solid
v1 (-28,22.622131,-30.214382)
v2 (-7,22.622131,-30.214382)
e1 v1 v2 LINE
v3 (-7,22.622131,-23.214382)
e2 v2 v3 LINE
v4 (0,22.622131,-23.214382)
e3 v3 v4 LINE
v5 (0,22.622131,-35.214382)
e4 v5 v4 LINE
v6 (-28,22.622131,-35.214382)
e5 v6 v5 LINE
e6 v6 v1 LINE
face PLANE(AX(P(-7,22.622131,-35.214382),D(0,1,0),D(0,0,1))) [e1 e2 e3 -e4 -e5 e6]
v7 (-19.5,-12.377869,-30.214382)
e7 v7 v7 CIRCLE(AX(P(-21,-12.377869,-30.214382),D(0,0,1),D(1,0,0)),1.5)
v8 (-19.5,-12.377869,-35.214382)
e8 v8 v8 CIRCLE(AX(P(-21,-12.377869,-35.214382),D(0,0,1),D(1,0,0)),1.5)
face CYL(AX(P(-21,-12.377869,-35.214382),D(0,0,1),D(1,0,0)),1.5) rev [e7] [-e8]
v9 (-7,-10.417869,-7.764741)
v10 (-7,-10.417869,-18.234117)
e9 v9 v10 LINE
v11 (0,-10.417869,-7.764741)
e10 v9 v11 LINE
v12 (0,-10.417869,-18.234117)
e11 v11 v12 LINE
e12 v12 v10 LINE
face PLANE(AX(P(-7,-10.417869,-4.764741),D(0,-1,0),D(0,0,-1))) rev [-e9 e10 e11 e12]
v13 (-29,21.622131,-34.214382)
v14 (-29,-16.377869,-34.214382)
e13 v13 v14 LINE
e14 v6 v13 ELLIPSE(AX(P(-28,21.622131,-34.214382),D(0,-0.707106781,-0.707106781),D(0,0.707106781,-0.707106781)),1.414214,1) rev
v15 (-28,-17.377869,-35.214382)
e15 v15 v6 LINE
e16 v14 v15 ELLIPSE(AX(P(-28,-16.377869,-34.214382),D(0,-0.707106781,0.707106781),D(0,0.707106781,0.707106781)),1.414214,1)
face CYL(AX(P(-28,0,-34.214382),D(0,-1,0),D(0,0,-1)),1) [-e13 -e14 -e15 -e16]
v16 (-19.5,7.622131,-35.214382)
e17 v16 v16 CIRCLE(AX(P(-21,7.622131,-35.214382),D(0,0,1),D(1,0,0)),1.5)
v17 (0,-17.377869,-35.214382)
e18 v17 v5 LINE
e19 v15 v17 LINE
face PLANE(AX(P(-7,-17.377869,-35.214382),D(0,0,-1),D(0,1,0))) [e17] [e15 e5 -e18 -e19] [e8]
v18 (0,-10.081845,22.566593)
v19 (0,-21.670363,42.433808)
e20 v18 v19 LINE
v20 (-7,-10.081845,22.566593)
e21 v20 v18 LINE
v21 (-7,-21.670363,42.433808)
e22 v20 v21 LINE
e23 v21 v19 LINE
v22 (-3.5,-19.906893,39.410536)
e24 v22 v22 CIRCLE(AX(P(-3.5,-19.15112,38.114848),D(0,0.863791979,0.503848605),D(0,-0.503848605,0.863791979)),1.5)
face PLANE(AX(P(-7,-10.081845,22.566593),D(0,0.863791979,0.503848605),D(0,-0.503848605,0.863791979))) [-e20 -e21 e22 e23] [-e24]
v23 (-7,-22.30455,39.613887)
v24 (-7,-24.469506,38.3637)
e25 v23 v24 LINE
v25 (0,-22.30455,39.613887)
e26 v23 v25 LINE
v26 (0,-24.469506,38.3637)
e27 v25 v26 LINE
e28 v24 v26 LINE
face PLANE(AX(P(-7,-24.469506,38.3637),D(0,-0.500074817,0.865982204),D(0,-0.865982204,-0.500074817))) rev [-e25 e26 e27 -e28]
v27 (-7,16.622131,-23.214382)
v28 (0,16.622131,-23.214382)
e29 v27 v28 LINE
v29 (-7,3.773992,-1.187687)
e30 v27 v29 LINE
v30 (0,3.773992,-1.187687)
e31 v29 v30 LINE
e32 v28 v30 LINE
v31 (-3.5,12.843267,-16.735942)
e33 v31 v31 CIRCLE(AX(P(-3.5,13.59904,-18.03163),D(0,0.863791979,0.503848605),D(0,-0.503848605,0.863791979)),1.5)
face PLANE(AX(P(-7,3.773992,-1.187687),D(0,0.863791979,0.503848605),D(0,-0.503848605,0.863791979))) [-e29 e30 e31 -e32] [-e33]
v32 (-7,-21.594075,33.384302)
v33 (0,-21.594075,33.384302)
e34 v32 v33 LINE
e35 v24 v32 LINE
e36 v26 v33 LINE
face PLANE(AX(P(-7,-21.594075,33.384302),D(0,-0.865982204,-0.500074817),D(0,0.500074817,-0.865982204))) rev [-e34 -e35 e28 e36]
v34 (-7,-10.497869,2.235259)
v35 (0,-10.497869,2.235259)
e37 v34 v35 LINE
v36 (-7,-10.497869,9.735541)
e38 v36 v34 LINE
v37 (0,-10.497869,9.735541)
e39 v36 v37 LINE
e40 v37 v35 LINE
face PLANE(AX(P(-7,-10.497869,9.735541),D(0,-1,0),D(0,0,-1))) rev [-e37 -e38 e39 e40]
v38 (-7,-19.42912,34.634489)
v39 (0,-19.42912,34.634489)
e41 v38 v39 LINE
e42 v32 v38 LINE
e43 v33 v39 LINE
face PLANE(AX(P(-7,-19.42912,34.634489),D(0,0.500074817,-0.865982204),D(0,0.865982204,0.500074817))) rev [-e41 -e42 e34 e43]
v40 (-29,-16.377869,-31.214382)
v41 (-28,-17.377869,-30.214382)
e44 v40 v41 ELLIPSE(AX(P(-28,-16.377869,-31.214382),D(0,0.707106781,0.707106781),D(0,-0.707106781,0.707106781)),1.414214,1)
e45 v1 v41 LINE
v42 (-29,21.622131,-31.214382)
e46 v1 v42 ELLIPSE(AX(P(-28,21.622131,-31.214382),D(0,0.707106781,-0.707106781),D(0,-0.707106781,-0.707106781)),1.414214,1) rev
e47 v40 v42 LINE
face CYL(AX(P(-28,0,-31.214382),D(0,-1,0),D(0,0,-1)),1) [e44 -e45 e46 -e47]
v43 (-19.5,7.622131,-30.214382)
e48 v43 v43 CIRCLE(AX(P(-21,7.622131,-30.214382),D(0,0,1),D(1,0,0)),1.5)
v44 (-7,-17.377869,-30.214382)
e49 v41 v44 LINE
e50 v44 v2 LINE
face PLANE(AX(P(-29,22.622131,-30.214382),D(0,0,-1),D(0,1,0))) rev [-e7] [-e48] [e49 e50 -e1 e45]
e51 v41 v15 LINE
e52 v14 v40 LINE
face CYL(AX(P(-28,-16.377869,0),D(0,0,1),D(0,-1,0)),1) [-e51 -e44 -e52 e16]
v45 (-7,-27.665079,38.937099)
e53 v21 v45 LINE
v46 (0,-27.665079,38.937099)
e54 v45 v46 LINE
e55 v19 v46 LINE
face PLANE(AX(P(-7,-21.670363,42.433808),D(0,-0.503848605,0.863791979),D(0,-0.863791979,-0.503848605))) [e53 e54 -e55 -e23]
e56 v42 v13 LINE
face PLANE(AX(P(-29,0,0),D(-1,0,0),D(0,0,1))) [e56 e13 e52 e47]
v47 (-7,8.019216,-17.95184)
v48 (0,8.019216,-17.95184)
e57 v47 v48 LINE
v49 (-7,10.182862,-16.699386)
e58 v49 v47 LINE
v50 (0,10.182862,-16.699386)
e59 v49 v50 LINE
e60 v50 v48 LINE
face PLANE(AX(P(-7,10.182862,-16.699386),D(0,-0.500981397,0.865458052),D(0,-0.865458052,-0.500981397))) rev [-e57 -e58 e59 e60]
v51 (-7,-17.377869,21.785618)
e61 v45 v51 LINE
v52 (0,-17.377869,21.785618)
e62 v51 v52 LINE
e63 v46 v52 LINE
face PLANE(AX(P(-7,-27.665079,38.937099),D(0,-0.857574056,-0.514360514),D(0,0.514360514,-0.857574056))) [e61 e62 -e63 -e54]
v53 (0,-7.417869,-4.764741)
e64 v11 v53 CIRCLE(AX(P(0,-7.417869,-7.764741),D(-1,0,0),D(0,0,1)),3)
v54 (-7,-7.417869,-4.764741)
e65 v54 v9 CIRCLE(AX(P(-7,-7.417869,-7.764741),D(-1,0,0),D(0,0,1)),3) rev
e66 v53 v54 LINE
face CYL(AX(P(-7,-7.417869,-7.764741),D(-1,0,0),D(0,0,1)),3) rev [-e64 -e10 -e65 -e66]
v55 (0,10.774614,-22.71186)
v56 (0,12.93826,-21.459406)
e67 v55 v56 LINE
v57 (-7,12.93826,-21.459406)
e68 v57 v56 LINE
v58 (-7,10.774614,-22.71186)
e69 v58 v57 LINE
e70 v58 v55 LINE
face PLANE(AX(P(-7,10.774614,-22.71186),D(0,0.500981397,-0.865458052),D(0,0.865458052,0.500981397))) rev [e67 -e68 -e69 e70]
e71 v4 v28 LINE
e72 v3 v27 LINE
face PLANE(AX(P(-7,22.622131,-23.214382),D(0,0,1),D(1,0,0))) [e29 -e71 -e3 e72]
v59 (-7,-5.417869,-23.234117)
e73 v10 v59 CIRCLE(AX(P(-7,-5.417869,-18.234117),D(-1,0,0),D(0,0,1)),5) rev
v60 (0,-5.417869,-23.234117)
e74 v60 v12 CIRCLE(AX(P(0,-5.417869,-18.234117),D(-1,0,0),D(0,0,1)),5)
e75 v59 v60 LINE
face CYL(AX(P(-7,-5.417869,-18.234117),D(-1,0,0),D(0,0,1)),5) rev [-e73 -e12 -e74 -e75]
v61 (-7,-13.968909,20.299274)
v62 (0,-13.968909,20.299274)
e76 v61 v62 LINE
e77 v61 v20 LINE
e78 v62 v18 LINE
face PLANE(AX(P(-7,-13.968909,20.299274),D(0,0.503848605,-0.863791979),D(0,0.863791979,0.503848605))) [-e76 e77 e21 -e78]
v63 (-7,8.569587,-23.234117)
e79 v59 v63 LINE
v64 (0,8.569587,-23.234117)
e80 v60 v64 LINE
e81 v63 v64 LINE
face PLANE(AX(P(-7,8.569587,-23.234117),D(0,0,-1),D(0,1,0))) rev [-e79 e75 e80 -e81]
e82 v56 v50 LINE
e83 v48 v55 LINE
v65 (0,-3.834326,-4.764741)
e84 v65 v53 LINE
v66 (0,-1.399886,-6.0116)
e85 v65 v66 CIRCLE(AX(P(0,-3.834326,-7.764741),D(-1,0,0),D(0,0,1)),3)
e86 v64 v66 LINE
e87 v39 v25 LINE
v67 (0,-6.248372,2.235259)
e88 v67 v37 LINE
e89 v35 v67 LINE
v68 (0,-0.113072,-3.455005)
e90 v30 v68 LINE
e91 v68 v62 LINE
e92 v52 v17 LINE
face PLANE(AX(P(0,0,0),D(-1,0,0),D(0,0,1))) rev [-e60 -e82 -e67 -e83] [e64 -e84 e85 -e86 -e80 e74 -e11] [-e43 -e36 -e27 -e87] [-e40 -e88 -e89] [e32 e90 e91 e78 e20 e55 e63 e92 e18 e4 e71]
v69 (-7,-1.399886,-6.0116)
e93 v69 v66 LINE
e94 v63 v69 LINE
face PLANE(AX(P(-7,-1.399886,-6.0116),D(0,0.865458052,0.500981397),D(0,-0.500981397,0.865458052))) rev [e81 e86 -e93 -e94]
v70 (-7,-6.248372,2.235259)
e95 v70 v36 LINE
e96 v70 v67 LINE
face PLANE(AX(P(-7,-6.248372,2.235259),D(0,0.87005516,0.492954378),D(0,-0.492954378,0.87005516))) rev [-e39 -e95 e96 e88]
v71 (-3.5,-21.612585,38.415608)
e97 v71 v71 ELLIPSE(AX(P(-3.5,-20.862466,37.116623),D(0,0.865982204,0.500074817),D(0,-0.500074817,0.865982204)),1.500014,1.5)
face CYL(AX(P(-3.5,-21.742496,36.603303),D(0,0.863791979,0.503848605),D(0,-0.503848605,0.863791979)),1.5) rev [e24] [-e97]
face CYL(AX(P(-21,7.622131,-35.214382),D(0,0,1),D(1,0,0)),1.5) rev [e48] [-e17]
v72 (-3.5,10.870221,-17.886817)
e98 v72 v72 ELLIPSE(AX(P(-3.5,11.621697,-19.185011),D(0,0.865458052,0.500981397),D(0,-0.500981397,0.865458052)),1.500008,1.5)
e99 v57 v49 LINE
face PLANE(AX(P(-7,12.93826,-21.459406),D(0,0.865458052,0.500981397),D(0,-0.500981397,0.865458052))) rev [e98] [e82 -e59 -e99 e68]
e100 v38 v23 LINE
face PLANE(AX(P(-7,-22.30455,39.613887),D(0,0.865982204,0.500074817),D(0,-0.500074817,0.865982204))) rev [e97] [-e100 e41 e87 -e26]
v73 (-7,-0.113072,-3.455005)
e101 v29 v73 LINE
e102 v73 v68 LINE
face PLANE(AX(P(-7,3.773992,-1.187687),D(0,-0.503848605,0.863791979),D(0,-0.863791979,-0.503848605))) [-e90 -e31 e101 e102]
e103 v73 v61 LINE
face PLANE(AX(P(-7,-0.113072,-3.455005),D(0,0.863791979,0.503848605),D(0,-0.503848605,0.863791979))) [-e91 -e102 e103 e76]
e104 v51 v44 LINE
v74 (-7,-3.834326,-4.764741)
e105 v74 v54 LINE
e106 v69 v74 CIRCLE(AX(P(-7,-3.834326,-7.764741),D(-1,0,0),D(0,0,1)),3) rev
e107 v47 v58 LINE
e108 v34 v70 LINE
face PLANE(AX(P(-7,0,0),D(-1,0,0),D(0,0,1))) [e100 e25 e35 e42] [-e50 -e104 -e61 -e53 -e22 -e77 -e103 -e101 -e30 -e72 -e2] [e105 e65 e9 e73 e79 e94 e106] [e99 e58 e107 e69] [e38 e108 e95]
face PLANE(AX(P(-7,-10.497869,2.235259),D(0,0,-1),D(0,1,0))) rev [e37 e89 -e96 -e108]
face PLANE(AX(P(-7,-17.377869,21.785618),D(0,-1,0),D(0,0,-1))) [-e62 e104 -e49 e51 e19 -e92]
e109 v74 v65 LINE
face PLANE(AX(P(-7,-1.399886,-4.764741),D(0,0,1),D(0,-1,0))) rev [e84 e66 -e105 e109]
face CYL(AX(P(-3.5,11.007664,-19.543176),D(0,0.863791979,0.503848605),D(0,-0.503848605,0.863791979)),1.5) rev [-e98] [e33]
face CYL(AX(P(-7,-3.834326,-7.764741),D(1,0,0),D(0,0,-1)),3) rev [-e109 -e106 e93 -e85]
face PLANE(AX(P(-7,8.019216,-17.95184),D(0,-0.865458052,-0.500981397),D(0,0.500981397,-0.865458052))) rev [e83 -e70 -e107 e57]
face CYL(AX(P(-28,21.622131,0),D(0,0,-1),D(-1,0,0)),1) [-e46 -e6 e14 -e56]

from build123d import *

# Parameters (mm, degrees)
BOSS_EXTRUDE1_DEPTH = 7
FILLET1_R           = 3
FILLET2_R           = 5
SKETCH2_W           = 5
SKETCH2_H           = 40
BOSS_EXTRUDE2_DEPTH = 22
SKETCH4_R           = 1.5
CUT_EXTRUDE1_DEPTH  = 3
SKETCH5_R           = 1.5
CUT_EXTRUDE2_DEPTH  = 5
FILLET3_R           = 1


with BuildPart() as part:
    # Sketch1 → Boss-Extrude1 (new body)
    with BuildSketch(Plane(origin=(0, 0, 0), x_dir=(0, 0, -1), z_dir=(1, 0, 0))):
        Polygon((-21.785617828, -17.377868865), (35.214382172, -17.377868865), (35.214382172, 22.622131135), (23.214382172, 22.622131135), (23.214382172, 16.622131135), (1.187686697, 3.773991719), (3.455005417, -0.113072189), (-20.299274017, -13.968908814), (-22.566592737, -10.081844907), (-42.433808264, -21.670362811), (-38.937098948, -27.665079148), align=None)
        Polygon((23.234116709, 8.569586546), (23.234116709, -10.417868865), (4.764740561, -10.417868865), (4.764740561, -1.399885987), (6.011600394, -1.399885987), align=None, mode=Mode.SUBTRACT)
        Polygon((-39.613886954, -22.304550046), (-34.634489281, -19.42911985), (-33.384302239, -21.59407536), (-38.363699913, -24.469505556), align=None, mode=Mode.SUBTRACT)
        Polygon((-9.735540794, -10.497868865), (-2.235259439, -10.497868865), (-2.235259439, -6.248372162), align=None, mode=Mode.SUBTRACT)
        Polygon((16.699385829, 10.182861543), (17.951839541, 8.019216032), (22.7118599, 10.774614335), (21.459406188, 12.938259845), align=None, mode=Mode.SUBTRACT)
    extrude(amount=-BOSS_EXTRUDE1_DEPTH)

    # Fillet1
    # the kernel refuses this fillet: 3 mm, written as the material it adds along each edge
    with BuildSketch(Plane(origin=(0, -10.417868865, -4.764740561), x_dir=(0, 0, -1), z_dir=(-1, 0, 0))) as fillet1_piece_1:
        with BuildLine():
            CenterArc((FILLET1_R, -FILLET1_R), FILLET1_R, 90, 90)
            Line((0, -FILLET1_R), (-FILLET1_R * 0.02, -FILLET1_R))
            Line((-FILLET1_R * 0.02, -FILLET1_R), (-FILLET1_R * 0.02, FILLET1_R * 0.02))
            Line((-FILLET1_R * 0.02, FILLET1_R * 0.02), (FILLET1_R, FILLET1_R * 0.02))
            Line((FILLET1_R, FILLET1_R * 0.02), (FILLET1_R, 0))
        make_face()
    extrude(amount=7)
    with BuildSketch(Plane(origin=(0, -1.399885987, -4.764740561), x_dir=(0, -1, 0), z_dir=(-1, 0, 0))) as fillet1_piece_2:
        with BuildLine():
            CenterArc((2.434440295, -3), FILLET1_R, 90, 54.240794128)
            Line((0, -1.246859832), (-0.048688806, -1.211797029))
            ThreePointArc((-0.048688806, -1.211797029), (-0.06, -0.623429916), (-0.06, 0))
            Line((-0.06, 0), (0, 0.06))
            Line((0, 0.06), (2.434440295, 0.06))
            Line((2.434440295, 0.06), (2.434440295, 0))
        make_face()
    extrude(amount=7)

    # Fillet2
    fillet2_edges = [part.edges().sort_by_distance(p)[0] for p in [
        (-3.5, -10.417868865, -23.234116709),
    ]]
    fillet(fillet2_edges, radius=FILLET2_R)

    # Sketch2 → Boss-Extrude2 (add)
    with BuildSketch(Plane.ZY.offset(7)):
        with Locations((-32.714382172, 2.622131135)):
            Rectangle(SKETCH2_W, SKETCH2_H)
    extrude(amount=BOSS_EXTRUDE2_DEPTH)

    # Sketch4 → Cut-Extrude1 (cut)
    with BuildSketch(Plane(origin=(0, 2.299007828, 1.341007921), x_dir=(1, 0, 0), z_dir=(0, 0.8637919794098133, 0.5038486045502921))):
        with Locations(Location((-3.5, 22.427434704, 0), (0, 0, 270))):
            Circle(SKETCH4_R)
        with Locations(Location((-3.5, -42.572565296, 0), (0, 0, 270))):
            Circle(SKETCH4_R)
    extrude(amount=-CUT_EXTRUDE1_DEPTH, mode=Mode.SUBTRACT)

    # Sketch5 → Cut-Extrude2 (cut)
    with BuildSketch(Plane.XY.offset(-30.214382172)):
        with Locations((-21, 7.622131135)):
            Circle(SKETCH5_R)
        with Locations((-21, -12.377868865)):
            Circle(SKETCH5_R)
    extrude(amount=-CUT_EXTRUDE2_DEPTH, mode=Mode.SUBTRACT)

    # Fillet3
    fillet3_edges = [part.edges().sort_by_distance(p)[0] for p in [
        (-29, 2.622131135, -35.214382172),
        (-29, -17.377868865, -32.714382172),
        (-29, 2.622131135, -30.214382172),
        (-29, 22.622131135, -32.714382172),
    ]]
    fillet(fillet3_edges, radius=FILLET3_R)


solid = part.part
